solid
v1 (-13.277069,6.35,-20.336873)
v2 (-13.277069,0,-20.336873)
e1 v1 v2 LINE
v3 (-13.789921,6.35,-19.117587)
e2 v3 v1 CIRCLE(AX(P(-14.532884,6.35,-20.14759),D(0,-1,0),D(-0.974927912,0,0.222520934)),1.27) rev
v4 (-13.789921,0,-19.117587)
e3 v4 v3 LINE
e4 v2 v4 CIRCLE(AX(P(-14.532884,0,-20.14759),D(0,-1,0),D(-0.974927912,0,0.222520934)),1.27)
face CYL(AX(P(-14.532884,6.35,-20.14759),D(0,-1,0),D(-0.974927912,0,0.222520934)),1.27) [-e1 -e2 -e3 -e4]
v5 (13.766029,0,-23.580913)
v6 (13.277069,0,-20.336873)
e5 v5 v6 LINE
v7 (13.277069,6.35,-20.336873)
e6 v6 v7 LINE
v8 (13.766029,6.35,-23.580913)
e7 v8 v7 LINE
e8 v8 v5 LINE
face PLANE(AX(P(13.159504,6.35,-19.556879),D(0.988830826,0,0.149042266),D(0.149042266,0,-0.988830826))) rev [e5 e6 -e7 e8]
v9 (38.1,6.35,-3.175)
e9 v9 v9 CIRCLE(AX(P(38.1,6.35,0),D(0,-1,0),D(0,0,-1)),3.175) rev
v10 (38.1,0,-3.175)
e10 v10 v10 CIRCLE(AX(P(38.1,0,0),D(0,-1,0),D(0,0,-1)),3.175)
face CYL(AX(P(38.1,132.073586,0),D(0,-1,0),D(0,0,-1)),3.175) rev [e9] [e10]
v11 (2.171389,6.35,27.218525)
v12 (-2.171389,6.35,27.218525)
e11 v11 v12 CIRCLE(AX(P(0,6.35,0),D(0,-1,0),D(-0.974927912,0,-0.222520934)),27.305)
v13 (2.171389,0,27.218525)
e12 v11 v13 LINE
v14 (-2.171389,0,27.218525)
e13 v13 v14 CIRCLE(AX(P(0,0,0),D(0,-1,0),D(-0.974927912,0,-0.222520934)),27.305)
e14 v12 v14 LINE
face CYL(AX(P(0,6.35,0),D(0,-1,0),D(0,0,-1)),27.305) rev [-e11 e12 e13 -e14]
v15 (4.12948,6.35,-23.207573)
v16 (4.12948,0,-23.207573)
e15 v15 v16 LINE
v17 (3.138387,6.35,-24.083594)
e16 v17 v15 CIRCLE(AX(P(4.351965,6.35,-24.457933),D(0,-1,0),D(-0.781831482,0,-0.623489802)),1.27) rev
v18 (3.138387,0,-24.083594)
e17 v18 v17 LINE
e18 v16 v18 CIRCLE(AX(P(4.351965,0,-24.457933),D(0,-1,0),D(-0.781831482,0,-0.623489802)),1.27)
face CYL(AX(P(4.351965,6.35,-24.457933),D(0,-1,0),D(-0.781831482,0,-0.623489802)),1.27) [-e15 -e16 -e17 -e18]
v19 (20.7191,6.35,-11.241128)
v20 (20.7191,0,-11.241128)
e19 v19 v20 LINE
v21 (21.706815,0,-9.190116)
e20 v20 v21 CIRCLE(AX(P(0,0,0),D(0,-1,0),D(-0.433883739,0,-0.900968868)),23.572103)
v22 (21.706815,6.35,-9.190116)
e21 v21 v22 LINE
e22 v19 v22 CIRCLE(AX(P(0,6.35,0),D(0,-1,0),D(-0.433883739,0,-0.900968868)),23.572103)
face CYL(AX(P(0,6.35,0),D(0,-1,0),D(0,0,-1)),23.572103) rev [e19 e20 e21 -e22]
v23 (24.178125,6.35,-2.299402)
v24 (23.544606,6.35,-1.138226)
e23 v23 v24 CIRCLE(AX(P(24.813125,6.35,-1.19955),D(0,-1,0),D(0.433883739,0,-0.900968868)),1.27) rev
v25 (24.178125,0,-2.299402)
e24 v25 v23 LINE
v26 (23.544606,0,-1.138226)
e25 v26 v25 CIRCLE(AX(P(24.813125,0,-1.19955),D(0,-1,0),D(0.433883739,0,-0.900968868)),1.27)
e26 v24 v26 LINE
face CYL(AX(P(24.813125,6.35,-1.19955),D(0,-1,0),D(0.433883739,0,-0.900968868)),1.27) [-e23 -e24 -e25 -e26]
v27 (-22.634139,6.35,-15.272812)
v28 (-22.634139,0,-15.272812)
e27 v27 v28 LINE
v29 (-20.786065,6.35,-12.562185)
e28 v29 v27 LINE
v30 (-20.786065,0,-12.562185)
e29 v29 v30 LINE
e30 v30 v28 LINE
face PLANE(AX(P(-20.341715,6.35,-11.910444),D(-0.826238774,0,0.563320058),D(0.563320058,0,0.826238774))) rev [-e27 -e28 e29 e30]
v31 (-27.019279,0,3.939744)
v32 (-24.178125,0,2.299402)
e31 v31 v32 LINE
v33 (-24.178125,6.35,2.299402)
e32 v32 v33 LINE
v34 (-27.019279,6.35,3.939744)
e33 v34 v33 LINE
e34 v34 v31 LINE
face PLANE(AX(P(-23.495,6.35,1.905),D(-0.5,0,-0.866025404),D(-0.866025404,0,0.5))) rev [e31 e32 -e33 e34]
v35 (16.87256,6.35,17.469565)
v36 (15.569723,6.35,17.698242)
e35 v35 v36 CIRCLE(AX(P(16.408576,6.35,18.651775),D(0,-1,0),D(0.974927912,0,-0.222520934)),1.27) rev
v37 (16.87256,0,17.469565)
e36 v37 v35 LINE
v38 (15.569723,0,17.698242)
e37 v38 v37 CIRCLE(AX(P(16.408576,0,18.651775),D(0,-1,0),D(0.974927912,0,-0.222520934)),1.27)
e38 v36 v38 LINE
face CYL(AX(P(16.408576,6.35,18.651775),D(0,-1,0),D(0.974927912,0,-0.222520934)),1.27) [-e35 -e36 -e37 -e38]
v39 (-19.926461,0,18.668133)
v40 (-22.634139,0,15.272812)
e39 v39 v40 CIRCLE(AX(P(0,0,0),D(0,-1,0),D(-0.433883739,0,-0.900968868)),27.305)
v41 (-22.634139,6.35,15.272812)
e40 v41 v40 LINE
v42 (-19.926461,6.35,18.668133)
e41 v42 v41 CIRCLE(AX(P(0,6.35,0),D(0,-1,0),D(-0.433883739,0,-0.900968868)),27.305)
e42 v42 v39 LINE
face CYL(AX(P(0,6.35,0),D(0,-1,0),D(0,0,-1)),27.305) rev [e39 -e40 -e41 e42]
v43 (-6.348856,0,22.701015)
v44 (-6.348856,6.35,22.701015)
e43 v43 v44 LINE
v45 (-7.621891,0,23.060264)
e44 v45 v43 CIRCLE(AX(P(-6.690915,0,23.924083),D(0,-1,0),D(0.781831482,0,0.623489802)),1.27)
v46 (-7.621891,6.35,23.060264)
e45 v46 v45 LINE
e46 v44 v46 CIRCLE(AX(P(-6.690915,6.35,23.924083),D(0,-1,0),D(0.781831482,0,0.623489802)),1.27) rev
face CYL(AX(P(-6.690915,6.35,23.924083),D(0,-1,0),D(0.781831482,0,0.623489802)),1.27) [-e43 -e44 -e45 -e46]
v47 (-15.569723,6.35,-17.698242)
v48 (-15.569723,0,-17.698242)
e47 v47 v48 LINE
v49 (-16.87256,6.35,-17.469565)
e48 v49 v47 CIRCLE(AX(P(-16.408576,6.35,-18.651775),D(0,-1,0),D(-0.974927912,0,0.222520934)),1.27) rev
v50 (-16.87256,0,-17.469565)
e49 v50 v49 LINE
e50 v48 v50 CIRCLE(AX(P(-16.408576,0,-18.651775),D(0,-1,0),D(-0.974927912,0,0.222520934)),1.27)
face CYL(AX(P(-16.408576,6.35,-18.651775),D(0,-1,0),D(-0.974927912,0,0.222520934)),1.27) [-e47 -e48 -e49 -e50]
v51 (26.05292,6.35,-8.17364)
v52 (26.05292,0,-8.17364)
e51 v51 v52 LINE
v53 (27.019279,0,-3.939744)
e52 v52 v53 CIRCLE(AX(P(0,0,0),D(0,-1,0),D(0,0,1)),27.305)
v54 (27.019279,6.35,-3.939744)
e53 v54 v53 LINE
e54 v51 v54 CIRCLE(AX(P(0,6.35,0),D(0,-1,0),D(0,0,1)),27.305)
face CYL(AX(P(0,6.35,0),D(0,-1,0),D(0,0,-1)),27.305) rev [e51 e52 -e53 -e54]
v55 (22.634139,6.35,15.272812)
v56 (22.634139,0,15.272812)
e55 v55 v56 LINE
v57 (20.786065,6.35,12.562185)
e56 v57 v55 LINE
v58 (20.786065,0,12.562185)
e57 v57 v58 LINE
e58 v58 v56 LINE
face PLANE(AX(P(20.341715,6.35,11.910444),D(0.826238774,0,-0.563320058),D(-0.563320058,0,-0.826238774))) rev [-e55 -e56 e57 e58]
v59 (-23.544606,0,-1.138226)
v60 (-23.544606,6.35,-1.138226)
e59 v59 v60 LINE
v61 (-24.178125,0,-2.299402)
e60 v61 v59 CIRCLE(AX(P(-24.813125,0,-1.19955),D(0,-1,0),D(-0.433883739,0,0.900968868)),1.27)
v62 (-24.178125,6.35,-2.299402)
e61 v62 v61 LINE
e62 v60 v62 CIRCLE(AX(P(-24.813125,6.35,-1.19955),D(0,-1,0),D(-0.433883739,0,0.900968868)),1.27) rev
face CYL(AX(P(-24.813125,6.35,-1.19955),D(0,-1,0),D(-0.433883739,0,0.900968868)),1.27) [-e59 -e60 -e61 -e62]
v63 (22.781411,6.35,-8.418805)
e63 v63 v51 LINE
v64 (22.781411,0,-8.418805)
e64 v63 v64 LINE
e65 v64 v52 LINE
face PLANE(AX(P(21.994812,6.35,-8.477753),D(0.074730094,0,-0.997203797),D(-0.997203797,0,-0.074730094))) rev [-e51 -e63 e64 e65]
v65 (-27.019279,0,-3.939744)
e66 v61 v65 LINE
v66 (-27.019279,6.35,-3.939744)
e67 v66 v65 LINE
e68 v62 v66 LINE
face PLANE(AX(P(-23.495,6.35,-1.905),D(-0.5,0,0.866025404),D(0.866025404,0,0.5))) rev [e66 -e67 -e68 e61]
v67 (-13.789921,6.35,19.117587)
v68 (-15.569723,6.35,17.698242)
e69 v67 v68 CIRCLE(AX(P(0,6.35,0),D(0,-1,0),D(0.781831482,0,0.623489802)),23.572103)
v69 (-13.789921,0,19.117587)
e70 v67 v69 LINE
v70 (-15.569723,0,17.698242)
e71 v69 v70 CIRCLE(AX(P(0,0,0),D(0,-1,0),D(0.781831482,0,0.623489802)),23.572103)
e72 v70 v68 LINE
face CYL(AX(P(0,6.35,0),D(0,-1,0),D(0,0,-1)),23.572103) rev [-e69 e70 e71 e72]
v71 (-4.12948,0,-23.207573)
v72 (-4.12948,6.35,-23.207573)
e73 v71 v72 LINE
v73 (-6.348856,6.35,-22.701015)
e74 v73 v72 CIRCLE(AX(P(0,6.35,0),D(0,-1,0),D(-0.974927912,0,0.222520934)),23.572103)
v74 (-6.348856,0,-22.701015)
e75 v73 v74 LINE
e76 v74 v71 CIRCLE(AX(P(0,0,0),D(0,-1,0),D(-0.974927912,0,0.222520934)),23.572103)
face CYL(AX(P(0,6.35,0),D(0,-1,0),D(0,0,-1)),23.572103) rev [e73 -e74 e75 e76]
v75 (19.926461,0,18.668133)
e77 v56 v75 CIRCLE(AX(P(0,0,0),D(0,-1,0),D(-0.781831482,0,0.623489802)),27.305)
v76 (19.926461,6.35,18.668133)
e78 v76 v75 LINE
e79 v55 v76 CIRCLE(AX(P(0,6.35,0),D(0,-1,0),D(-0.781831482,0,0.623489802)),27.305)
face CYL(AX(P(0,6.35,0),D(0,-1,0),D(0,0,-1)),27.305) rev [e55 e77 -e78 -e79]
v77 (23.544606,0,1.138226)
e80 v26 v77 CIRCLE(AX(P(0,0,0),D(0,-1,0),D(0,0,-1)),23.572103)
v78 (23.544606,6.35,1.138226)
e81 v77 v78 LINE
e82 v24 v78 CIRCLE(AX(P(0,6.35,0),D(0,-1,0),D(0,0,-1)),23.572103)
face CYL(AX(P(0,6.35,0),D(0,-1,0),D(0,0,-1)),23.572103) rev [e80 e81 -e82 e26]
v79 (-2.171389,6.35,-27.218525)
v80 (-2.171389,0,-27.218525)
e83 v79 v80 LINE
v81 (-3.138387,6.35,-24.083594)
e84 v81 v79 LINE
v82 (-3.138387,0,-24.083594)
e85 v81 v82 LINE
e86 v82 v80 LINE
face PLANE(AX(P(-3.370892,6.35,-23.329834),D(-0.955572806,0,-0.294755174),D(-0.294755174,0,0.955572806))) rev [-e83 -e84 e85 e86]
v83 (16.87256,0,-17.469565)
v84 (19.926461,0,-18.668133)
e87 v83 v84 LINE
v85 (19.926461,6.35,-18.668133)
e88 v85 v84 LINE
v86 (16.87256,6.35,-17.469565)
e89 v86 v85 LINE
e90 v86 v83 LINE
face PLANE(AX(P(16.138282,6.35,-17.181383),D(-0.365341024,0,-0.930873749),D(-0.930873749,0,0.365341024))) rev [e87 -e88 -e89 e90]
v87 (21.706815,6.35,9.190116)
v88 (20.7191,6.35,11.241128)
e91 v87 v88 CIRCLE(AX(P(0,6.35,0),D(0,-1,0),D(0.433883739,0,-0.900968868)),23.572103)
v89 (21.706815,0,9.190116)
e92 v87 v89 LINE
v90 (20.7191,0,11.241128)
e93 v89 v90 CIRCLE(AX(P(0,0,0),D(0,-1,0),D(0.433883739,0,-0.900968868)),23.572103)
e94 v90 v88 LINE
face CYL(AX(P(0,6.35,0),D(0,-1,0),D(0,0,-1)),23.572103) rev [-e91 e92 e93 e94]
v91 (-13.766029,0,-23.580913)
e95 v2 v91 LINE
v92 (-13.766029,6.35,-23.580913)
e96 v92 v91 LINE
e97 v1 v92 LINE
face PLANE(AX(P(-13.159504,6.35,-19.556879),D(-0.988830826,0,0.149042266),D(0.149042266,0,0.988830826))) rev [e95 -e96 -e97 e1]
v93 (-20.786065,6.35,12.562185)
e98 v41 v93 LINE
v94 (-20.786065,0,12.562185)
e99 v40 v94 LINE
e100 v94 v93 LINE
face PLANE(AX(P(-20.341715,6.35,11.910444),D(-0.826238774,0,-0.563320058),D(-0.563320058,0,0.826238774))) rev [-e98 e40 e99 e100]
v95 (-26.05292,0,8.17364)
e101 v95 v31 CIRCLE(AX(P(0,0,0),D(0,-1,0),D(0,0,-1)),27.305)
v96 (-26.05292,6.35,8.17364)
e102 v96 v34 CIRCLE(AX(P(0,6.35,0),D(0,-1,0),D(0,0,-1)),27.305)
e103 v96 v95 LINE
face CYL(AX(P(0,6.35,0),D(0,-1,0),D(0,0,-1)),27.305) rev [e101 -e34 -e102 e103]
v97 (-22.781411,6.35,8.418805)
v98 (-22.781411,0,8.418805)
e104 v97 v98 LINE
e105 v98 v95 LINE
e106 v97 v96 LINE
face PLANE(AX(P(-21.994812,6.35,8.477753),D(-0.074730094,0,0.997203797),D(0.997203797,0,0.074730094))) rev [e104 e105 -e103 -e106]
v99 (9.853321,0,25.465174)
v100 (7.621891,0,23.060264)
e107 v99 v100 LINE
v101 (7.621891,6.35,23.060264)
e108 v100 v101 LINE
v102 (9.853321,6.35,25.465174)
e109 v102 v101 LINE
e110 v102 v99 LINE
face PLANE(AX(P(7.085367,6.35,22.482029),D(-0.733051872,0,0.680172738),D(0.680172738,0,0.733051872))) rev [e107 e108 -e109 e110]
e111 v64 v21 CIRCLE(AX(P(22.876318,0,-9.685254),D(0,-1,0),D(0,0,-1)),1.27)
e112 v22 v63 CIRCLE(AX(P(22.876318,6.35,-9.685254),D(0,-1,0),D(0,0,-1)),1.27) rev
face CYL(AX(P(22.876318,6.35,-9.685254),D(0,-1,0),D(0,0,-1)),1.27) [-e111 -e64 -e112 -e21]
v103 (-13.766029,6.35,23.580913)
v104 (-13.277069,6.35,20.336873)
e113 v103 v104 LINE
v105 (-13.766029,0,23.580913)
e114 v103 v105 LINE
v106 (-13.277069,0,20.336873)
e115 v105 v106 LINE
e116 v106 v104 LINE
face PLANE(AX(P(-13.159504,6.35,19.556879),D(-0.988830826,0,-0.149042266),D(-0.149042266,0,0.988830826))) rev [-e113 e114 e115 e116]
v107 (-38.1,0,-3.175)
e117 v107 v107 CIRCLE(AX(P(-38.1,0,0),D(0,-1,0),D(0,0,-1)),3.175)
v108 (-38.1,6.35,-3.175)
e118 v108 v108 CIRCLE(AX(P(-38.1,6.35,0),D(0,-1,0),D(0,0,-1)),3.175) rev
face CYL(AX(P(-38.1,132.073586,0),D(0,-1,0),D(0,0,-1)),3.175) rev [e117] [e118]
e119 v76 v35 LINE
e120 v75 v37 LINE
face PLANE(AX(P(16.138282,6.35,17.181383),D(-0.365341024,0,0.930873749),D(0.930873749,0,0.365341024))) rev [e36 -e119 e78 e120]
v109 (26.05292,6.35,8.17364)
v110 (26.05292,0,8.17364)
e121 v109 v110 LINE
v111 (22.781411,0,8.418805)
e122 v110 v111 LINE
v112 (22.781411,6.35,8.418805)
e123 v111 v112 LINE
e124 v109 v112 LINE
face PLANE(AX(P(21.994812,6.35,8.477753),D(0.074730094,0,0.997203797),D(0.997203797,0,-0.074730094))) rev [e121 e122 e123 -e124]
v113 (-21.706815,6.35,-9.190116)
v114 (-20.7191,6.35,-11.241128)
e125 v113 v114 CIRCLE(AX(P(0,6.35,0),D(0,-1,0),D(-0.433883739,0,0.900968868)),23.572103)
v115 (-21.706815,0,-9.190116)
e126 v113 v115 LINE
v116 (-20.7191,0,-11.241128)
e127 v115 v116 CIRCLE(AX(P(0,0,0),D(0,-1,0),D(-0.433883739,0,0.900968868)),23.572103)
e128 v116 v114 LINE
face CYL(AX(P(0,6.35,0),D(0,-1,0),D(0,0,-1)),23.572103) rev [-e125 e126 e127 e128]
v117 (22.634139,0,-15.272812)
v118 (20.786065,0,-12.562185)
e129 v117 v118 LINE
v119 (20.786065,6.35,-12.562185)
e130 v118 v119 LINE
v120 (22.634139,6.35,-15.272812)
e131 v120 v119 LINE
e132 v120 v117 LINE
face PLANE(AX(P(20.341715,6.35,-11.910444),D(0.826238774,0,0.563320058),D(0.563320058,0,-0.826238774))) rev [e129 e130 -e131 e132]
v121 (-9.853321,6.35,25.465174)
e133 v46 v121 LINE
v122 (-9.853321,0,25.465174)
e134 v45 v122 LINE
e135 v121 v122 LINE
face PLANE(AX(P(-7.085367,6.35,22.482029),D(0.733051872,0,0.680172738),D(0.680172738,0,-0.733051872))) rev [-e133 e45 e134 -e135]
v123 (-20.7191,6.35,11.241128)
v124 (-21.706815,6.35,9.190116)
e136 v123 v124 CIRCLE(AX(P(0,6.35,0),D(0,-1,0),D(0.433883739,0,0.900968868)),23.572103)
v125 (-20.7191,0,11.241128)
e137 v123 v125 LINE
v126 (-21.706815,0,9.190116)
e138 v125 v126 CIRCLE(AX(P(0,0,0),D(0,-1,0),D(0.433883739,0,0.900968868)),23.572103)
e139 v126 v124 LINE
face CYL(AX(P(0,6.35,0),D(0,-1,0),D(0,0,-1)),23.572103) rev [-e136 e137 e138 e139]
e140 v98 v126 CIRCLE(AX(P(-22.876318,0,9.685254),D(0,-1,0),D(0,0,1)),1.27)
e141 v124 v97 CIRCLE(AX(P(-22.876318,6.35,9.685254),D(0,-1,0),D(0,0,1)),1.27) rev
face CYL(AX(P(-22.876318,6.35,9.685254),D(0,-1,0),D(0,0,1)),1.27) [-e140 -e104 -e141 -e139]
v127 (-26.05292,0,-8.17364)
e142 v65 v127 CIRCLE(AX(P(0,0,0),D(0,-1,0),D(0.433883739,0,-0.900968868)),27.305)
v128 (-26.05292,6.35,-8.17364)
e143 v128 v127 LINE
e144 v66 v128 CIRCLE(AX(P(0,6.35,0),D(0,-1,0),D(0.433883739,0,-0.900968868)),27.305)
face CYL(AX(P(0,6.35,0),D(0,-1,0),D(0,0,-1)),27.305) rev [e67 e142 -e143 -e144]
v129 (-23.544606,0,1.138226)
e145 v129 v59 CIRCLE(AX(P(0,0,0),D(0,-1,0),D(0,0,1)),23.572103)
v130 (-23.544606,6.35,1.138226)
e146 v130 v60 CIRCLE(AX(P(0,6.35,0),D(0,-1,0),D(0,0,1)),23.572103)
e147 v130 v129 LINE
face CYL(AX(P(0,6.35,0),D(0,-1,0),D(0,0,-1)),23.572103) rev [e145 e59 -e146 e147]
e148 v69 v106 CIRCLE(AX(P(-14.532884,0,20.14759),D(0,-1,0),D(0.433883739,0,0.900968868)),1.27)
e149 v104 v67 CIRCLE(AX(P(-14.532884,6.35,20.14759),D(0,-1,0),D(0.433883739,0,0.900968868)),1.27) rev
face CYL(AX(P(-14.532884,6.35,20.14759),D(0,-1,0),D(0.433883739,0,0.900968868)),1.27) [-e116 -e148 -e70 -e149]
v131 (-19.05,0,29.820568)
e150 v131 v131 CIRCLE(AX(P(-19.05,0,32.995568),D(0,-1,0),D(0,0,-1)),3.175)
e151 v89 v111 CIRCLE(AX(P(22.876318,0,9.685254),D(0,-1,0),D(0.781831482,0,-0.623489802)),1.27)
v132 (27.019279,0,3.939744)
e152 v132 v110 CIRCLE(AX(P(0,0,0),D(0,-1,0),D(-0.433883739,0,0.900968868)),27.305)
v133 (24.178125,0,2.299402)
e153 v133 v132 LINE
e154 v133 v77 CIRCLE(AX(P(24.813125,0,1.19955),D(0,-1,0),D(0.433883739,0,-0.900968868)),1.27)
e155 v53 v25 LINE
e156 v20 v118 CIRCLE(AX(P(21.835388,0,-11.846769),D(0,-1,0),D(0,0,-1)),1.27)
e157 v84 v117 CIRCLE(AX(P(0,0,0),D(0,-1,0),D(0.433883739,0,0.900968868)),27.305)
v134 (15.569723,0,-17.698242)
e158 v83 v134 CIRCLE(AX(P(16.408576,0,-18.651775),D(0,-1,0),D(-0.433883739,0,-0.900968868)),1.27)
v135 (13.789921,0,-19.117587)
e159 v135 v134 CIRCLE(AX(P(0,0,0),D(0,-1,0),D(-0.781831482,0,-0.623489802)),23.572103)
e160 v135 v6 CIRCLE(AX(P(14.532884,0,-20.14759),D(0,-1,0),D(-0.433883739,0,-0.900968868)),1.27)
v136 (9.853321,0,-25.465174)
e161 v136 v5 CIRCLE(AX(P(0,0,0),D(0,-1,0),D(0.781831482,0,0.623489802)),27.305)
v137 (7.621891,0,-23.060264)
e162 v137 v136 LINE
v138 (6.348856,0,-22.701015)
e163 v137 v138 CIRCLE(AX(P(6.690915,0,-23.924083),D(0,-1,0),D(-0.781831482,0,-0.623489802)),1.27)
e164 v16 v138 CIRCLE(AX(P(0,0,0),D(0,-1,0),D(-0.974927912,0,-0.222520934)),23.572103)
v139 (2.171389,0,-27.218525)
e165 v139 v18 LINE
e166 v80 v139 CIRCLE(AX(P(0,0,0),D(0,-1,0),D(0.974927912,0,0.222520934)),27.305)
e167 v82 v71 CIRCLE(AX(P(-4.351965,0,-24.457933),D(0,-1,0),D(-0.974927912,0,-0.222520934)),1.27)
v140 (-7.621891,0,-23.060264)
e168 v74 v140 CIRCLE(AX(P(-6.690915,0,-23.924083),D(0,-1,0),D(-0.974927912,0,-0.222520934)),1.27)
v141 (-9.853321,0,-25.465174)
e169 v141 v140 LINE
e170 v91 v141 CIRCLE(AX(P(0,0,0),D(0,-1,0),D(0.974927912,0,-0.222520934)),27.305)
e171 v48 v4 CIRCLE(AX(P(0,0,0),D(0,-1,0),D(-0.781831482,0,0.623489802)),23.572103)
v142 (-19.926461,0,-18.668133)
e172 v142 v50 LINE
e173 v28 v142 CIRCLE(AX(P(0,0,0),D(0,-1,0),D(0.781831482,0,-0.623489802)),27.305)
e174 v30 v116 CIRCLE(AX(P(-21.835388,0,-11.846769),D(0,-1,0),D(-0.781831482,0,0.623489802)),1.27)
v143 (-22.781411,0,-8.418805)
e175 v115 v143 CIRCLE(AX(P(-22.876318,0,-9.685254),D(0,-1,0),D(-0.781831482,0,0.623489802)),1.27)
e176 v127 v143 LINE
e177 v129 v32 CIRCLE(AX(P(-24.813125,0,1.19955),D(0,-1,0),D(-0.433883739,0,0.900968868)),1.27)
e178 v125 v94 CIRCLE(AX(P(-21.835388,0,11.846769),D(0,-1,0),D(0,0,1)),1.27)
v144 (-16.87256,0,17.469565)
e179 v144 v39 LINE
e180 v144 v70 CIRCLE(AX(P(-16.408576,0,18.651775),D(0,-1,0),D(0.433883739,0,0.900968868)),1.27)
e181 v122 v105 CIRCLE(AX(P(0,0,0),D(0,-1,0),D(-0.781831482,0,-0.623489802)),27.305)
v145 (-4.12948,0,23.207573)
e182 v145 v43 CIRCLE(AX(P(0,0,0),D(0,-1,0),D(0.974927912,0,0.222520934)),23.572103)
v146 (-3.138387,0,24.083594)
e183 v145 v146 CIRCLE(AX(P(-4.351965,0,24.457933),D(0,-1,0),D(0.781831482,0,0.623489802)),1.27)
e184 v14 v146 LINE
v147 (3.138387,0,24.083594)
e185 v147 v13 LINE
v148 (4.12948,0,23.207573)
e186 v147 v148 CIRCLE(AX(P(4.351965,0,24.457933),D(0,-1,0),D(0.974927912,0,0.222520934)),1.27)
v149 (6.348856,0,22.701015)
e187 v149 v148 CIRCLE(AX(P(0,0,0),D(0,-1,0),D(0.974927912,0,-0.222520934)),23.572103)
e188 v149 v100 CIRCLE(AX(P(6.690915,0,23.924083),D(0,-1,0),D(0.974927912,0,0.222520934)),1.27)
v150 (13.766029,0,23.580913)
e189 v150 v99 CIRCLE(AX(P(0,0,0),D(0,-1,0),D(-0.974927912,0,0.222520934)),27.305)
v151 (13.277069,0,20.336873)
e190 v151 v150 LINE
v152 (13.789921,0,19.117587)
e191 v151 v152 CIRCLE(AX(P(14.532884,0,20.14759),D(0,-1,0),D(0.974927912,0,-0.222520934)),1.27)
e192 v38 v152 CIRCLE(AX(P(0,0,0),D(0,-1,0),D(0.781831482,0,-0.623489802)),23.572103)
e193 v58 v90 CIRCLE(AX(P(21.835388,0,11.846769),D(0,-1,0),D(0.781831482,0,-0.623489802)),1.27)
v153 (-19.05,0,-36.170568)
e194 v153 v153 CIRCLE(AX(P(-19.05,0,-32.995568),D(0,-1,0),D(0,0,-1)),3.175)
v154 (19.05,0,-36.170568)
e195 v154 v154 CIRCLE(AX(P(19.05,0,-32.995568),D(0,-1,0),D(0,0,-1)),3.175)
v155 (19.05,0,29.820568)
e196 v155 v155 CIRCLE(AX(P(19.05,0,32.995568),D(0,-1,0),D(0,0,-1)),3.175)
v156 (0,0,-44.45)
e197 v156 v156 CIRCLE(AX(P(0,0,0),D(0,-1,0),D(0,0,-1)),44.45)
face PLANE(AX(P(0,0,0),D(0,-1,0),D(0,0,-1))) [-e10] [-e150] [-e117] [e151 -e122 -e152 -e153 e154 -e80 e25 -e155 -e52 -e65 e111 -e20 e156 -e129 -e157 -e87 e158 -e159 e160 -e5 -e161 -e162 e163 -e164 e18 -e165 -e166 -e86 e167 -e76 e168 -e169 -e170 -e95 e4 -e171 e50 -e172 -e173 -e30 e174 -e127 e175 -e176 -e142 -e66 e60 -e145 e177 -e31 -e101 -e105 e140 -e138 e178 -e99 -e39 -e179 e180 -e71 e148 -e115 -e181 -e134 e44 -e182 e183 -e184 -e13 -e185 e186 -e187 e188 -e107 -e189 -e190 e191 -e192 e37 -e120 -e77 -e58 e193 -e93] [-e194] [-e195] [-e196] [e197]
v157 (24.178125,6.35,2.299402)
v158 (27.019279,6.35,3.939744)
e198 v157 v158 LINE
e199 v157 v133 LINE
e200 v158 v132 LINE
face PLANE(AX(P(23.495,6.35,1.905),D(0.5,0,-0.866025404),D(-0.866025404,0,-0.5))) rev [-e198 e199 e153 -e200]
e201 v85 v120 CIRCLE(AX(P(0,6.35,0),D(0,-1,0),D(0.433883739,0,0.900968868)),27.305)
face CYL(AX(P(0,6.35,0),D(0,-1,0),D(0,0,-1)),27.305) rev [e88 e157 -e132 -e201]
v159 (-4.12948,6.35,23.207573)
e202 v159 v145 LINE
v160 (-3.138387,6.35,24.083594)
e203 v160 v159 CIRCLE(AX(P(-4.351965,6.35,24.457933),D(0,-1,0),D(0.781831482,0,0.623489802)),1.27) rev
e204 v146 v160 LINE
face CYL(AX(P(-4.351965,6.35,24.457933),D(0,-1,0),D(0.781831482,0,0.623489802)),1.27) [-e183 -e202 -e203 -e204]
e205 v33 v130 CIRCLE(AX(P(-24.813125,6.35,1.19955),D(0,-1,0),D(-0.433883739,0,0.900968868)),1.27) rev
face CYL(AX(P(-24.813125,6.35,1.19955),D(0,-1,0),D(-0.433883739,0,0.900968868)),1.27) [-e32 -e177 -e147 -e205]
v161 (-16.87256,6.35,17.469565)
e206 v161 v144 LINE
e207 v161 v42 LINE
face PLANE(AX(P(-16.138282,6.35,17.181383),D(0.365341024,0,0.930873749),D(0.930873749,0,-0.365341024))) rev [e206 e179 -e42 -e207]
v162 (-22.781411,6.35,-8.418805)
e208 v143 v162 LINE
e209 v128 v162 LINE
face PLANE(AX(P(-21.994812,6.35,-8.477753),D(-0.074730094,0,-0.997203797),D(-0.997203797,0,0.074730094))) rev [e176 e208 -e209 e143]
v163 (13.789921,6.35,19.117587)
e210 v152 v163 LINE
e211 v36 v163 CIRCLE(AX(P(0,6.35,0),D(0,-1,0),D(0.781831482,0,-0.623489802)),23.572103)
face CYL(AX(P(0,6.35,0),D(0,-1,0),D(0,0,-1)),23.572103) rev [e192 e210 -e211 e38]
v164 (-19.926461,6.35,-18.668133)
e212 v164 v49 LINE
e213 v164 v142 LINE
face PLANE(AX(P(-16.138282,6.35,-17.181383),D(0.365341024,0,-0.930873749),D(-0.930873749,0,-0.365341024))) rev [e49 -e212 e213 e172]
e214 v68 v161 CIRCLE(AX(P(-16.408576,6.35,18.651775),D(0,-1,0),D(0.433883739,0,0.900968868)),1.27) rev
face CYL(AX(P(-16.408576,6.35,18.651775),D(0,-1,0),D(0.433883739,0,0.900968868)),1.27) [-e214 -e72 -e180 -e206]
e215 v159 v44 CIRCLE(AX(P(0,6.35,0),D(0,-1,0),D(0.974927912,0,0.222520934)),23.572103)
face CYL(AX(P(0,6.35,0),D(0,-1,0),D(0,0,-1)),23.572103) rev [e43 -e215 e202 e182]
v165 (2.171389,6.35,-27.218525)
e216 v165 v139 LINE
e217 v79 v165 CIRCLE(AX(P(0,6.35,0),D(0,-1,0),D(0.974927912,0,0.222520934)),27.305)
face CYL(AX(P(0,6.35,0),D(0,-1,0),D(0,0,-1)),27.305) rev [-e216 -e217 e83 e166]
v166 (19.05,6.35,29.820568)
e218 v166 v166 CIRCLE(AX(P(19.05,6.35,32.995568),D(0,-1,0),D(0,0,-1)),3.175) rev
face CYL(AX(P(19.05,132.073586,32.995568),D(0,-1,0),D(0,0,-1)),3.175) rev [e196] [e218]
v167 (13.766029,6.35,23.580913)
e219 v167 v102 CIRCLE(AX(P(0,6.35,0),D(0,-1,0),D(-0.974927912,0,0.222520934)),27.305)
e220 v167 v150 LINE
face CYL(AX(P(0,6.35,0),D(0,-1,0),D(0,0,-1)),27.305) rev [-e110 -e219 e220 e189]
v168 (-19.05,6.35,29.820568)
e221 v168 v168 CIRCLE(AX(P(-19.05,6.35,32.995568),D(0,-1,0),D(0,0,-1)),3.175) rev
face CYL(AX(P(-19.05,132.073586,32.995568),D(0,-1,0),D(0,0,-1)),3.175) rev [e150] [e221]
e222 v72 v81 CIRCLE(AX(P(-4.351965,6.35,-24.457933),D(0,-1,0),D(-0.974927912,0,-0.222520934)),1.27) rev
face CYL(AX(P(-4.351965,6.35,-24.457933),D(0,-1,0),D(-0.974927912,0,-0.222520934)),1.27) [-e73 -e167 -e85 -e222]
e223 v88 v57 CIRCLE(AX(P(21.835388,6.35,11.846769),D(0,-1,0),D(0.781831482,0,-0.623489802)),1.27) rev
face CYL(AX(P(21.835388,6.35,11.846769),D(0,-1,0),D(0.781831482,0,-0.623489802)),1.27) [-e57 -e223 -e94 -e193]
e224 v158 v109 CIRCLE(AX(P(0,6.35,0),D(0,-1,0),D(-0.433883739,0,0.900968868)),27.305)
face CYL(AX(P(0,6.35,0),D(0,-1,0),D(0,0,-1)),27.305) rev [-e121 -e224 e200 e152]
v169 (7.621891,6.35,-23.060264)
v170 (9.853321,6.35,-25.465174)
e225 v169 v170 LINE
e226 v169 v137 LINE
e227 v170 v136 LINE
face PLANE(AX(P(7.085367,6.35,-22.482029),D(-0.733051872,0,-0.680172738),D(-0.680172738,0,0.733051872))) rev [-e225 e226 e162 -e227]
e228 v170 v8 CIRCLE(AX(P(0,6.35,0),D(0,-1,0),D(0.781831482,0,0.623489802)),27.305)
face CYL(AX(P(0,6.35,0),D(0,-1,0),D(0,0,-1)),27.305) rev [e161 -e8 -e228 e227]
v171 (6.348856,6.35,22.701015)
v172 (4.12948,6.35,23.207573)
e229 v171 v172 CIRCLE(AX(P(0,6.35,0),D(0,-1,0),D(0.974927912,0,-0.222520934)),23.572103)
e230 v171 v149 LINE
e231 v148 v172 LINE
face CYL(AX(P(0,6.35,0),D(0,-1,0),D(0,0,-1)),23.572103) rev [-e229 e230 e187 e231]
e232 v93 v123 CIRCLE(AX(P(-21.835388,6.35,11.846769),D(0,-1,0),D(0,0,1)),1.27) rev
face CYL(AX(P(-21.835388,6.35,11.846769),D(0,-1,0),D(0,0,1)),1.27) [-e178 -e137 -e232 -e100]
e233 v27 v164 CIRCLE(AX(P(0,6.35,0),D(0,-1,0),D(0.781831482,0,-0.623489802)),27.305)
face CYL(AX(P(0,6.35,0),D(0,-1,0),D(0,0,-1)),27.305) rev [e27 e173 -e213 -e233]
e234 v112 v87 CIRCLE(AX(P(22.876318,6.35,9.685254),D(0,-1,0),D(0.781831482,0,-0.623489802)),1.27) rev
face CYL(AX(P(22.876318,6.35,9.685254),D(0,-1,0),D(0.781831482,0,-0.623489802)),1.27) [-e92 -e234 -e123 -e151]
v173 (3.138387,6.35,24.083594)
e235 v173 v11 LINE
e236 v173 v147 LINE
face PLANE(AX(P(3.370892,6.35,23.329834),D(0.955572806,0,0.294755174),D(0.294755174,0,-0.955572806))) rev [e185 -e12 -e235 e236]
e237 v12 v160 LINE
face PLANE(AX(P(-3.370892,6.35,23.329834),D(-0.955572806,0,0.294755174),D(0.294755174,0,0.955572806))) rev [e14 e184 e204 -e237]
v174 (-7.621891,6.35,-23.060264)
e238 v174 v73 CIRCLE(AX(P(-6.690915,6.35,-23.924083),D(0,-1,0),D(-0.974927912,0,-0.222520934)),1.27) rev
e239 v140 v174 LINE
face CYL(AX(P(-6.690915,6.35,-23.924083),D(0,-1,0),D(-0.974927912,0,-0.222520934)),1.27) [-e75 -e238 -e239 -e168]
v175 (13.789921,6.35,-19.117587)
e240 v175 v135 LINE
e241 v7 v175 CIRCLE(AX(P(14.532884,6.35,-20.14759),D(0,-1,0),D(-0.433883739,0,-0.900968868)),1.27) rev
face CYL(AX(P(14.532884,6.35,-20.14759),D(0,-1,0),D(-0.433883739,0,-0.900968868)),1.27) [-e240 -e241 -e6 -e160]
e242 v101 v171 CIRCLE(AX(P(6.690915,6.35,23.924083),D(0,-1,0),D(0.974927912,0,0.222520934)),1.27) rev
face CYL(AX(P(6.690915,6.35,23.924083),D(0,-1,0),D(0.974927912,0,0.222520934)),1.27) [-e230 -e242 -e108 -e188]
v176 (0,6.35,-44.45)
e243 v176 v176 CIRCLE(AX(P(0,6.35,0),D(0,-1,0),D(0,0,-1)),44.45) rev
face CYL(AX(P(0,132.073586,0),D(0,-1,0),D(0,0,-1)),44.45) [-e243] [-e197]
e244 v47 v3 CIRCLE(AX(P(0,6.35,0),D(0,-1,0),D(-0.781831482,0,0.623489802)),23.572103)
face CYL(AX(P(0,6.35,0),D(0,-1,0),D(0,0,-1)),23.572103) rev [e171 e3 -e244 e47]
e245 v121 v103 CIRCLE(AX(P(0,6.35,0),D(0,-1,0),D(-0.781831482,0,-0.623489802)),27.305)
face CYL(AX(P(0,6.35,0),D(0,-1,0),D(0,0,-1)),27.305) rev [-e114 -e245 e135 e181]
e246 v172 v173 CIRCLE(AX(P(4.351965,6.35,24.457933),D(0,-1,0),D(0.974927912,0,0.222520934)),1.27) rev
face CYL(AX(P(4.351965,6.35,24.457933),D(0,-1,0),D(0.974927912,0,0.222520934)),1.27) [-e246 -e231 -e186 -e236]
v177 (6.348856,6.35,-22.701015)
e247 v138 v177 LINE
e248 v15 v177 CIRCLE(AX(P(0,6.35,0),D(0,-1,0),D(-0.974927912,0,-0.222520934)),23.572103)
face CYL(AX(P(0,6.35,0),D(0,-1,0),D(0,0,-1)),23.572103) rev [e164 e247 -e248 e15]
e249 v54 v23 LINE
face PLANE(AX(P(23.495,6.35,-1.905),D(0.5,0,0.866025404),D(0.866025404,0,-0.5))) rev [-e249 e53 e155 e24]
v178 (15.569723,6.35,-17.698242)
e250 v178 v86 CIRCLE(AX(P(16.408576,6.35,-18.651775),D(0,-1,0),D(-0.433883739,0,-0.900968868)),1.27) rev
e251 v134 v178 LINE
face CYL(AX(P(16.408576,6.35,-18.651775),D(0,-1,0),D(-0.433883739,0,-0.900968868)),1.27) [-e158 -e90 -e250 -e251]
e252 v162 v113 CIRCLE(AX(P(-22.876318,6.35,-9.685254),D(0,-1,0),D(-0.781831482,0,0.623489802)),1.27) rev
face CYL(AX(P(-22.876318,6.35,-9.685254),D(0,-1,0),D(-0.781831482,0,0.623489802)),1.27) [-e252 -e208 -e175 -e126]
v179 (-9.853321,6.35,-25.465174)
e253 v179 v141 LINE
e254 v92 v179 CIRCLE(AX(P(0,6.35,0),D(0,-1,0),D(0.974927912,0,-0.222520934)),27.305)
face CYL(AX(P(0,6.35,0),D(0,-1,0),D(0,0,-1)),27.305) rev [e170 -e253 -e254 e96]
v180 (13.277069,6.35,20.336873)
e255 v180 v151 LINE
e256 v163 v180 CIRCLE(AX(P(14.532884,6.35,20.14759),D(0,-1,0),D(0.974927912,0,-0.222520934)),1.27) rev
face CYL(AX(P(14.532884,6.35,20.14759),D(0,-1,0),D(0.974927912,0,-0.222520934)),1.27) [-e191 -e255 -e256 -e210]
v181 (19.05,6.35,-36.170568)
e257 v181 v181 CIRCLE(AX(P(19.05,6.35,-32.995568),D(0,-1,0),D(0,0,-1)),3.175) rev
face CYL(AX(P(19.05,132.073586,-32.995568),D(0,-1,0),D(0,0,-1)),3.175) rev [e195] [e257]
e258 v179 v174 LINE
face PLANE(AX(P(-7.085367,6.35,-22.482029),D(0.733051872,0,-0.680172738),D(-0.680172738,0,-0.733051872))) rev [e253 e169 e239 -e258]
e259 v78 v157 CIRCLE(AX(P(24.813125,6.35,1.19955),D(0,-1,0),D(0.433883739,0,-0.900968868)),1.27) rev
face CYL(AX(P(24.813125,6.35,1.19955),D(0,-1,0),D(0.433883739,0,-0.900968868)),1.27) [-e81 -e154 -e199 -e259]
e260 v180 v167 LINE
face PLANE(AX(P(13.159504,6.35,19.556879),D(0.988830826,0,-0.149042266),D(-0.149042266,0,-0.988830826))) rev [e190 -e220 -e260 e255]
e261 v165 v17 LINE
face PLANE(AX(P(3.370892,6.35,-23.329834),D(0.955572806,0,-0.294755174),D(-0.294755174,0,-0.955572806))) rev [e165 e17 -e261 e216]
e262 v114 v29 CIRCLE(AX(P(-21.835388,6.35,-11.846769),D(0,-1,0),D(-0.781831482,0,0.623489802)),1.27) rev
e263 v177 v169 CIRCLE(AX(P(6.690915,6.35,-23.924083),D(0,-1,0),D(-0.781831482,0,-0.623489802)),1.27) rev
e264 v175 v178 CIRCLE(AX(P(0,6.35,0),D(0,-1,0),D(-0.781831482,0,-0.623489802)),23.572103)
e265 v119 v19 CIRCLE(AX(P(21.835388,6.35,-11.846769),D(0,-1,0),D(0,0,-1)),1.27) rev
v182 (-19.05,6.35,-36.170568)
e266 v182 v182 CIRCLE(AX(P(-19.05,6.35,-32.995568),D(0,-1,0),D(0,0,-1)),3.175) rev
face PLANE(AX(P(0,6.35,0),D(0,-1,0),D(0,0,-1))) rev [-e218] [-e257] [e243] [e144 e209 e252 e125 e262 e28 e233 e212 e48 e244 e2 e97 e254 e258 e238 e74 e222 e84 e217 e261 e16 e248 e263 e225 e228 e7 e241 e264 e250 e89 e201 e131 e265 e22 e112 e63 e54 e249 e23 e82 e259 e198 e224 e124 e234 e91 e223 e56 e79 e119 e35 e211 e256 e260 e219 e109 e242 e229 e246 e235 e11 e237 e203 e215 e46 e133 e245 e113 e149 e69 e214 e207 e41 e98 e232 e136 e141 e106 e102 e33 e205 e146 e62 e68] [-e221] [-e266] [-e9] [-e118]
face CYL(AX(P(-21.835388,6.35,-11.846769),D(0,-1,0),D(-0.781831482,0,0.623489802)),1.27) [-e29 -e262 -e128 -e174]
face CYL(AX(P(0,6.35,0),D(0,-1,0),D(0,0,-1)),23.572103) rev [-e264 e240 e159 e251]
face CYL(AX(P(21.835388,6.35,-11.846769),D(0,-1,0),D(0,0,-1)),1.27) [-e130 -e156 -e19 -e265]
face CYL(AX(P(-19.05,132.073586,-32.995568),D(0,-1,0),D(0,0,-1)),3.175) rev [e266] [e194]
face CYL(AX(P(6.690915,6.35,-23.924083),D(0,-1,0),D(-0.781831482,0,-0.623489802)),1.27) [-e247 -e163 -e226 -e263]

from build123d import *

# Parameters (mm, degrees)
TOOTH_DEPTH         = 6.35
CIRPATTERN2_COUNT   = 14
FILLET2_R           = 1.27
CIRPATTERN10_DEPTH  = 6.35
SKETCH2_R           = 44.45
SKETCH2_R_2         = 3.175
SKETCH2_R_3         = 33.655
BOSS_EXTRUDE2_DEPTH = 6.35


# Read off the part's stored shape, not the designer's step: CirPattern10
with BuildPart() as part:
    # Sketch1 → tooth (new body)
    with BuildSketch(Plane(origin=(0, 0, 0), x_dir=(1, 0, 0), z_dir=(0, 1, 0))):
        with BuildLine():
            Line((23.495, 1.905), (27.019279154, 3.939743518))
            ThreePointArc((27.019279154, 3.939743518), (26.594581963, 6.18799121), (25.983150393, 8.392789801))
            Line((25.983150393, 8.392789801), (32.025743508, 10.344601382))
            ThreePointArc((32.025743508, 10.344601382), (33.536845379, 2.817627907), (33.302832446, -4.855962941))
            Line((33.302832446, -4.855962941), (27.019279154, -3.939743518))
            Line((27.019279154, -3.939743518), (23.495, -1.905))
            ThreePointArc((23.495, -1.905), (23.572103215, 0), (23.495, 1.905))
        make_face()
    tooth = extrude(amount=TOOTH_DEPTH)

    # CirPattern2: tooth ×14 about axis
    cirpattern2_axis = Axis((0, 0, 0), (0, 1, 0))
    for i in range(1, CIRPATTERN2_COUNT):
        add(tooth.rotate(cirpattern2_axis, i * 360 / CIRPATTERN2_COUNT))

    # Fillet2
    fillet2_edges = [part.edges().sort_by_distance(p)[0] for p in [
        (20.341715028, 3.175, -11.910444144),
        (21.994812074, 3.175, -8.477752757),
    ]]
    fillet(fillet2_edges, radius=FILLET2_R)

    # CirPattern10 outline → CirPattern10 (cut)
    with BuildSketch(Plane(origin=(0, 0, 0), x_dir=(1, 0, 0), z_dir=(0, 1, 0))):
        with BuildLine():
            ThreePointArc((21.994812074, -8.477752757), (21.853716341, -8.835107925), (21.706815016, -9.190115986))
            ThreePointArc((21.706815016, -9.190115986), (22.135768899, -8.653514623), (22.781411207, -8.418805301))
            Line((22.781411207, -8.418805301), (21.994812074, -8.477752757))
        make_face()
        with BuildLine():
            ThreePointArc((20.786064589, -12.562185248), (20.567016331, -11.911062896), (20.719099799, -11.241127769))
            ThreePointArc((20.719099799, -11.241127769), (20.533134799, -11.577323755), (20.341715028, -11.910444144))
            Line((20.341715028, -11.910444144), (20.786064589, -12.562185248))
        make_face()
        with BuildLine():
            ThreePointArc((16.138281869, -17.181382608), (15.85610841, -17.442129345), (15.569722665, -17.698242459))
            ThreePointArc((15.569722665, -17.698242459), (16.189019364, -17.400897451), (16.872559541, -17.469565358))
            Line((16.872559541, -17.469565358), (16.138281869, -17.181382608))
        make_face()
        with BuildLine():
            ThreePointArc((13.277069174, -20.336873246), (13.362224913, -19.655190801), (13.789921341, -19.117586652))
            ThreePointArc((13.789921341, -19.117586652), (13.476502695, -19.339801579), (13.159503921, -19.556878753))
            Line((13.159503921, -19.556878753), (13.277069174, -20.336873246))
        make_face()
        with BuildLine():
            ThreePointArc((7.085367016, -22.482028918), (6.718003745, -22.594523135), (6.348855789, -22.70101496))
            ThreePointArc((6.348855789, -22.70101496), (7.035835999, -22.701819131), (7.62189053, -23.060263746))
            Line((7.62189053, -23.060263746), (7.085367016, -22.482028918))
        make_face()
        with BuildLine():
            ThreePointArc((3.138387377, -24.083594083), (3.510880975, -23.506367113), (4.12947984, -23.207573037))
            ThreePointArc((4.12947984, -23.207573037), (3.750683953, -23.271794514), (3.370891671, -23.329833676))
            Line((3.370891671, -23.329833676), (3.138387377, -24.083594083))
        make_face()
        with BuildLine():
            ThreePointArc((-3.370891671, -23.329833676), (-3.750683953, -23.271794514), (-4.12947984, -23.207573037))
            ThreePointArc((-4.12947984, -23.207573037), (-3.510880975, -23.506367113), (-3.138387377, -24.083594083))
            Line((-3.138387377, -24.083594083), (-3.370891671, -23.329833676))
        make_face()
        with BuildLine():
            ThreePointArc((-7.62189053, -23.060263746), (-7.035835999, -22.701819131), (-6.348855789, -22.701014959))
            ThreePointArc((-6.348855789, -22.701014959), (-6.718003745, -22.594523135), (-7.085367016, -22.482028918))
            Line((-7.085367016, -22.482028918), (-7.62189053, -23.060263746))
        make_face()
        with BuildLine():
            ThreePointArc((-13.159503921, -19.556878753), (-13.476502695, -19.339801579), (-13.789921341, -19.117586652))
            ThreePointArc((-13.789921341, -19.117586652), (-13.362224913, -19.655190801), (-13.277069174, -20.336873246))
            Line((-13.277069174, -20.336873246), (-13.159503921, -19.556878753))
        make_face()
        with BuildLine():
            ThreePointArc((-16.872559541, -17.469565358), (-16.189019364, -17.400897451), (-15.569722665, -17.698242459))
            ThreePointArc((-15.569722665, -17.698242459), (-15.85610841, -17.442129345), (-16.138281869, -17.181382608))
            Line((-16.138281869, -17.181382608), (-16.872559541, -17.469565358))
        make_face()
        with BuildLine():
            ThreePointArc((-20.341715028, -11.910444144), (-20.533134799, -11.577323755), (-20.719099799, -11.241127769))
            ThreePointArc((-20.719099799, -11.241127769), (-20.567016331, -11.911062896), (-20.786064589, -12.562185248))
            Line((-20.786064589, -12.562185248), (-20.341715028, -11.910444144))
        make_face()
        with BuildLine():
            ThreePointArc((-22.781411207, -8.418805301), (-22.135768899, -8.653514623), (-21.706815017, -9.190115986))
            ThreePointArc((-21.706815017, -9.190115986), (-21.853716341, -8.835107925), (-21.994812074, -8.477752757))
            Line((-21.994812074, -8.477752757), (-22.781411207, -8.418805301))
        make_face()
        with BuildLine():
            ThreePointArc((-23.495, -1.905), (-23.522927734, -1.521814974), (-23.544606438, -1.138225668))
            ThreePointArc((-23.544606438, -1.138225668), (-23.698257926, -1.807802905), (-24.178124988, -2.299402395))
            Line((-24.178124988, -2.299402395), (-23.495, -1.905))
        make_face()
        with BuildLine():
            ThreePointArc((-24.178124988, 2.299402395), (-23.698257926, 1.807802905), (-23.544606438, 1.138225668))
            ThreePointArc((-23.544606438, 1.138225668), (-23.522927734, 1.521814974), (-23.495, 1.905))
            Line((-23.495, 1.905), (-24.178124988, 2.299402395))
        make_face()
        with BuildLine():
            ThreePointArc((-21.994812074, 8.477752757), (-21.853716341, 8.835107925), (-21.706815016, 9.190115986))
            ThreePointArc((-21.706815016, 9.190115986), (-22.135768899, 8.653514623), (-22.781411207, 8.418805301))
            Line((-22.781411207, 8.418805301), (-21.994812074, 8.477752757))
        make_face()
        with BuildLine():
            ThreePointArc((-20.786064589, 12.562185248), (-20.567016331, 11.911062896), (-20.719099799, 11.241127769))
            ThreePointArc((-20.719099799, 11.241127769), (-20.533134799, 11.577323755), (-20.341715028, 11.910444144))
            Line((-20.341715028, 11.910444144), (-20.786064589, 12.562185248))
        make_face()
        with BuildLine():
            ThreePointArc((-16.138281869, 17.181382608), (-15.85610841, 17.442129345), (-15.569722665, 17.698242459))
            ThreePointArc((-15.569722665, 17.698242459), (-16.189019364, 17.400897451), (-16.872559541, 17.469565358))
            Line((-16.872559541, 17.469565358), (-16.138281869, 17.181382608))
        make_face()
        with BuildLine():
            ThreePointArc((-13.277069174, 20.336873246), (-13.362224913, 19.655190801), (-13.789921341, 19.117586652))
            ThreePointArc((-13.789921341, 19.117586652), (-13.476502695, 19.339801579), (-13.159503921, 19.556878753))
            Line((-13.159503921, 19.556878753), (-13.277069174, 20.336873246))
        make_face()
        with BuildLine():
            ThreePointArc((-7.085367016, 22.482028918), (-6.718003745, 22.594523135), (-6.348855789, 22.70101496))
            ThreePointArc((-6.348855789, 22.70101496), (-7.035835999, 22.701819131), (-7.62189053, 23.060263746))
            Line((-7.62189053, 23.060263746), (-7.085367016, 22.482028918))
        make_face()
        with BuildLine():
            ThreePointArc((-3.138387377, 24.083594083), (-3.510880975, 23.506367113), (-4.12947984, 23.207573037))
            ThreePointArc((-4.12947984, 23.207573037), (-3.750683953, 23.271794514), (-3.370891671, 23.329833676))
            Line((-3.370891671, 23.329833676), (-3.138387377, 24.083594083))
        make_face()
        with BuildLine():
            ThreePointArc((3.370891671, 23.329833676), (3.750683953, 23.271794514), (4.12947984, 23.207573037))
            ThreePointArc((4.12947984, 23.207573037), (3.510880975, 23.506367113), (3.138387377, 24.083594083))
            Line((3.138387377, 24.083594083), (3.370891671, 23.329833676))
        make_face()
        with BuildLine():
            ThreePointArc((7.62189053, 23.060263746), (7.035835999, 22.701819131), (6.348855789, 22.701014959))
            ThreePointArc((6.348855789, 22.701014959), (6.718003745, 22.594523135), (7.085367016, 22.482028918))
            Line((7.085367016, 22.482028918), (7.62189053, 23.060263746))
        make_face()
        with BuildLine():
            ThreePointArc((13.159503921, 19.556878753), (13.476502695, 19.339801579), (13.789921341, 19.117586652))
            ThreePointArc((13.789921341, 19.117586652), (13.362224913, 19.655190801), (13.277069174, 20.336873246))
            Line((13.277069174, 20.336873246), (13.159503921, 19.556878753))
        make_face()
        with BuildLine():
            ThreePointArc((16.872559541, 17.469565358), (16.189019364, 17.400897451), (15.569722665, 17.698242459))
            ThreePointArc((15.569722665, 17.698242459), (15.85610841, 17.442129345), (16.138281869, 17.181382608))
            Line((16.138281869, 17.181382608), (16.872559541, 17.469565358))
        make_face()
        with BuildLine():
            ThreePointArc((23.495, 1.905), (23.522927734, 1.521814974), (23.544606438, 1.138225668))
            ThreePointArc((23.544606438, 1.138225668), (23.698257926, 1.807802905), (24.178124988, 2.299402395))
            Line((24.178124988, 2.299402395), (23.495, 1.905))
        make_face()
        with BuildLine():
            ThreePointArc((24.178124988, -2.299402395), (23.698257926, -1.807802905), (23.544606438, -1.138225668))
            ThreePointArc((23.544606438, -1.138225668), (23.522927734, -1.521814974), (23.495, -1.905))
            Line((23.495, -1.905), (24.178124988, -2.299402395))
        make_face()
    extrude(amount=CIRPATTERN10_DEPTH, mode=Mode.SUBTRACT)

    # Sketch2 → Boss-Extrude2 (add)
    with BuildSketch(Plane.XZ):
        with Locations(Location((0, 0, 0), (0, 0, 270))):
            Circle(SKETCH2_R)
        with Locations(Location((38.1, 0, 0), (0, 0, 270))):
            Circle(SKETCH2_R_2, mode=Mode.SUBTRACT)
        Circle(SKETCH2_R_3, mode=Mode.SUBTRACT)
        with Locations(Location((19.05, -32.995567884, 0), (0, 0, 270))):
            Circle(SKETCH2_R_2, mode=Mode.SUBTRACT)
        with Locations(Location((-19.05, -32.995567884, 0), (0, 0, 270))):
            Circle(SKETCH2_R_2, mode=Mode.SUBTRACT)
        with Locations(Location((-38.1, 0, 0), (0, 0, 270))):
            Circle(SKETCH2_R_2, mode=Mode.SUBTRACT)
        with Locations(Location((-19.05, 32.995567884, 0), (0, 0, 270))):
            Circle(SKETCH2_R_2, mode=Mode.SUBTRACT)
        with Locations(Location((19.05, 32.995567884, 0), (0, 0, 270))):
            Circle(SKETCH2_R_2, mode=Mode.SUBTRACT)
    extrude(amount=-BOSS_EXTRUDE2_DEPTH)


solid = part.part
